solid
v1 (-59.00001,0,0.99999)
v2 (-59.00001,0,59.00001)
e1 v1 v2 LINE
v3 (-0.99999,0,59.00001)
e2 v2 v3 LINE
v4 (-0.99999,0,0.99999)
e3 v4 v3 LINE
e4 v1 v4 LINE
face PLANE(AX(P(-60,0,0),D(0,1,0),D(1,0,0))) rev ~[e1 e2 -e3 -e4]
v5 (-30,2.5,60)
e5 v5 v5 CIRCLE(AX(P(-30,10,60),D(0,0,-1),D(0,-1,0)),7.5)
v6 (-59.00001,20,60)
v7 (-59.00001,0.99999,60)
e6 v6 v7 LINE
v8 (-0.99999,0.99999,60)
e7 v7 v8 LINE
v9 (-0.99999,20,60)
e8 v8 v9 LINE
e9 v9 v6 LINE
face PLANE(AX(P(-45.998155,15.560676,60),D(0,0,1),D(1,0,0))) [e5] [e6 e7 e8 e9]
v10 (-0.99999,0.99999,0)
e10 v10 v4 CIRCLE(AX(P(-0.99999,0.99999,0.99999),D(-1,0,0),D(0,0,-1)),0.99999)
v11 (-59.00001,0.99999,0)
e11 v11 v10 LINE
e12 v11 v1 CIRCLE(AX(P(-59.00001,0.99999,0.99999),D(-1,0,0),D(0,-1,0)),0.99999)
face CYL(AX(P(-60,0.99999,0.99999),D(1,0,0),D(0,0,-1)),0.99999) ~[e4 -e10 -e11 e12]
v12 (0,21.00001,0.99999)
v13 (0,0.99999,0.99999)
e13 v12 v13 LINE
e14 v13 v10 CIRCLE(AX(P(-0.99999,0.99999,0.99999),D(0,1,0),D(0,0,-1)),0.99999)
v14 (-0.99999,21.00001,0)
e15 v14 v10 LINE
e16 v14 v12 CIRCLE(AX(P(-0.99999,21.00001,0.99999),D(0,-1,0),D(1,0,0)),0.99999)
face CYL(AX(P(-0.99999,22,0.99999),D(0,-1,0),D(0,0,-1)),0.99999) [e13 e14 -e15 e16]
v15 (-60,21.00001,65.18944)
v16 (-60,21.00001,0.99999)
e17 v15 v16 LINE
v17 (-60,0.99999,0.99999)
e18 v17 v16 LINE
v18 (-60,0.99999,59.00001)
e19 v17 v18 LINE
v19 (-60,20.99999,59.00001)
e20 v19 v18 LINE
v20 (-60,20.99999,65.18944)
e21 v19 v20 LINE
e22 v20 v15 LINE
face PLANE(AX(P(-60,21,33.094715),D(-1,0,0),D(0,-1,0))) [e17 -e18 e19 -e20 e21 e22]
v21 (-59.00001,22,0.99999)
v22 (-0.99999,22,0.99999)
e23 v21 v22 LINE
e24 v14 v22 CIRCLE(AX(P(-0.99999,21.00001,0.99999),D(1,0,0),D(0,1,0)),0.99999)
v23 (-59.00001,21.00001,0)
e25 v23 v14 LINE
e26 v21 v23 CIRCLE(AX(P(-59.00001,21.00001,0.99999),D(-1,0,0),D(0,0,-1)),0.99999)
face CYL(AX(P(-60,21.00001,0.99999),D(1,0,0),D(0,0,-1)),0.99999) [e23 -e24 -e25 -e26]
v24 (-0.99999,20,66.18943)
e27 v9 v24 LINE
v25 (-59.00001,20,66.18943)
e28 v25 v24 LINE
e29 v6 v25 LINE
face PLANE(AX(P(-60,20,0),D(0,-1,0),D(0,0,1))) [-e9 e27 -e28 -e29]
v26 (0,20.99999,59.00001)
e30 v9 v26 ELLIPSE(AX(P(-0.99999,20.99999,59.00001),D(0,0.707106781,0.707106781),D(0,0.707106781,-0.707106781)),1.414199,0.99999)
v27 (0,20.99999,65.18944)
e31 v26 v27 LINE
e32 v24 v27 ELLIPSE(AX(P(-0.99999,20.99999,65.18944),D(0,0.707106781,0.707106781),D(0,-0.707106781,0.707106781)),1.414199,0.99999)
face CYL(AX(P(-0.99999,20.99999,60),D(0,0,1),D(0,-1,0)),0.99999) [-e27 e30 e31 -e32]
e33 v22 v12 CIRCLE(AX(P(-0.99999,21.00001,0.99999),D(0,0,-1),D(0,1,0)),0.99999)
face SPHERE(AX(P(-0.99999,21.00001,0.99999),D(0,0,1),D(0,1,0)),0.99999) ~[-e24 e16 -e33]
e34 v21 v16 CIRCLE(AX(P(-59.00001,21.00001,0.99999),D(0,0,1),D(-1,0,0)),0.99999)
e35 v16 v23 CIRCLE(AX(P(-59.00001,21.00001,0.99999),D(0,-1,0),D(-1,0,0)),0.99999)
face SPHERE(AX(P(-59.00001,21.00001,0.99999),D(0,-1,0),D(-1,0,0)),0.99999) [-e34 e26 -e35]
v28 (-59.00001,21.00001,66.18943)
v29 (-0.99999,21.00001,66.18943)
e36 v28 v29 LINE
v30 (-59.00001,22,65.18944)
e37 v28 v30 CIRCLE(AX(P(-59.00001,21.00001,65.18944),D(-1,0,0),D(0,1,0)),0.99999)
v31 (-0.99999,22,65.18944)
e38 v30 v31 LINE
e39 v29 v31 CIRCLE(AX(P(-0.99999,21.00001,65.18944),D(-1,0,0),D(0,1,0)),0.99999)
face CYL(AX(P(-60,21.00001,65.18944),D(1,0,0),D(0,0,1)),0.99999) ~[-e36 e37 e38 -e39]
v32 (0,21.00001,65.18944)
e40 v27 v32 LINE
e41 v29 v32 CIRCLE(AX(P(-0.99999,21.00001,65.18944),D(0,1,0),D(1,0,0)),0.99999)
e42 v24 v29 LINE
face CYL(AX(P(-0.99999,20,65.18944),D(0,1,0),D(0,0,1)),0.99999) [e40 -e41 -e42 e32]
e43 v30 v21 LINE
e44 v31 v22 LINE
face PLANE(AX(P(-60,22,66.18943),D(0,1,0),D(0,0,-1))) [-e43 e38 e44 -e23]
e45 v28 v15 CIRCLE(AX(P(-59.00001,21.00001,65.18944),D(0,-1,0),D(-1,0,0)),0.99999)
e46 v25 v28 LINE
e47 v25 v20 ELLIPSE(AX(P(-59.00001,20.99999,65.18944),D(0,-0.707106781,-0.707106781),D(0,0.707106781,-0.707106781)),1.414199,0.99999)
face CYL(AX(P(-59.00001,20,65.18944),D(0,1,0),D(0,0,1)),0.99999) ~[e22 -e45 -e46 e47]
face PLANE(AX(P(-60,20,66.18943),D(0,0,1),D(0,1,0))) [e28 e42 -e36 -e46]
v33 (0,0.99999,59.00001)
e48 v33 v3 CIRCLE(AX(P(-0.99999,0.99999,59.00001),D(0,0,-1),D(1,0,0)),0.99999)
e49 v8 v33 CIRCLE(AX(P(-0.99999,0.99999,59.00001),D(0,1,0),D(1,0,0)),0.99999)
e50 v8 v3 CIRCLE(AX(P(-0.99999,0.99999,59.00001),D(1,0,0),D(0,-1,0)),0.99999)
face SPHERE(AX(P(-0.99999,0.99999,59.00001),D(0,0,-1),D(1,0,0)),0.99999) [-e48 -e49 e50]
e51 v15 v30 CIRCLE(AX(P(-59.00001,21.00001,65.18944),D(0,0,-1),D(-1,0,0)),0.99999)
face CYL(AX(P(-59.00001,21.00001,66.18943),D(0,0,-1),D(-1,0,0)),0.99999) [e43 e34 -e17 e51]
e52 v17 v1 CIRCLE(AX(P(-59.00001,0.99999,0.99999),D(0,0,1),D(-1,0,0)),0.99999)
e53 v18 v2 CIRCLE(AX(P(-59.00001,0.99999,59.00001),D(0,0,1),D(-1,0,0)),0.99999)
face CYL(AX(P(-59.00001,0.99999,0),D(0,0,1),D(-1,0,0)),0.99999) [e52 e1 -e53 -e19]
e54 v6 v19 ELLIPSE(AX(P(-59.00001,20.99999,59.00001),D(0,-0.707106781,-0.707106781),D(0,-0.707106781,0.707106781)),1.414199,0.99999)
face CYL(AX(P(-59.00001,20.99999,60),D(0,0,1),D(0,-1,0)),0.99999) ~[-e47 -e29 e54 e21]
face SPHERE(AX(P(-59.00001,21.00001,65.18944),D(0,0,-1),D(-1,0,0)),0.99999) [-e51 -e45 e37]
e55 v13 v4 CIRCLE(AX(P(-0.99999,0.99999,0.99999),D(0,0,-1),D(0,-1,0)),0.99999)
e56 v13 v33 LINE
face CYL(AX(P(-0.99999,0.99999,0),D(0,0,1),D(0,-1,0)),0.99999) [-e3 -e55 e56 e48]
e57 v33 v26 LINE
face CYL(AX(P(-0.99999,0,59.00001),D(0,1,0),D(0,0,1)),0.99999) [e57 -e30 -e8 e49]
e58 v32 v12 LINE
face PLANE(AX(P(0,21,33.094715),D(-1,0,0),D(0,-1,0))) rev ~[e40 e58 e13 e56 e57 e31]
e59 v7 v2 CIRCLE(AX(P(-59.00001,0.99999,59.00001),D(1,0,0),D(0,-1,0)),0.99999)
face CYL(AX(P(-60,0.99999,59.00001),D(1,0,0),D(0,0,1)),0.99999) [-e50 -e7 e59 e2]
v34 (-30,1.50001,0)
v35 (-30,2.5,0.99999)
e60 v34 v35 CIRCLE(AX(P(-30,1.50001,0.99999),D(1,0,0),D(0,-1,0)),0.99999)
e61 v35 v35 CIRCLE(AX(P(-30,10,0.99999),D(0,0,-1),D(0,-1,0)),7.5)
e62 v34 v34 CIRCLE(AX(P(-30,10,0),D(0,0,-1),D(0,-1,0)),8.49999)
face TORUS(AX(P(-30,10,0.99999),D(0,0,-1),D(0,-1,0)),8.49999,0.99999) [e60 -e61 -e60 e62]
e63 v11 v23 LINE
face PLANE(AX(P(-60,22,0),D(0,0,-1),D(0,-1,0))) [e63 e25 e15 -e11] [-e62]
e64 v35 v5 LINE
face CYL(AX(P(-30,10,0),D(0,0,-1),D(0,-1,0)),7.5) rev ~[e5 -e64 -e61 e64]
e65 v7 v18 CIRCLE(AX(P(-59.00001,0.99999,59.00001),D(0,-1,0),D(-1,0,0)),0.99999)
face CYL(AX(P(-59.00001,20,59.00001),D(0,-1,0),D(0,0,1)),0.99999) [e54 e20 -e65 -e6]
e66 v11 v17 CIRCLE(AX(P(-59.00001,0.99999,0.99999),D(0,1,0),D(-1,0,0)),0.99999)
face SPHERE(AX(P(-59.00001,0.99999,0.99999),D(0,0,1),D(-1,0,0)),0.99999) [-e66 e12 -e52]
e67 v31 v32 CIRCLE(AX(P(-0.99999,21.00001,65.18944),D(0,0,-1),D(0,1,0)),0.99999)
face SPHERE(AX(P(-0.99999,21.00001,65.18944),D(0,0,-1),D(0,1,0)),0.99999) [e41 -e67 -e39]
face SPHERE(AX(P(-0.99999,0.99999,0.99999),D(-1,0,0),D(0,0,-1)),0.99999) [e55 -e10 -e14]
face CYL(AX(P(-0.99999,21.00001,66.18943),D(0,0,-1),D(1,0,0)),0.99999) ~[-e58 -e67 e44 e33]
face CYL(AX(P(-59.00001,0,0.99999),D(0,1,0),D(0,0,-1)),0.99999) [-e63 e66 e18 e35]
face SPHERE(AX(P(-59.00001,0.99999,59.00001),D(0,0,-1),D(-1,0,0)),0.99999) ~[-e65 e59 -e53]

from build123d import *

# Parameters (mm, degrees)
F1_DEPTH = 60
F3_DEPTH = 60
F4_R     = 0.99999


# Not quite as in the source:
# - a fillet or chamfer is up to 0.001 mm smaller than in the source, because OpenCascade refuses the exact size
# - the program builds the solid bodies; features that only make, move or delete a surface that nothing else refers to are left out


with BuildPart() as f1:
    # F0 (on Top) → F1 (new body)
    with BuildSketch(Plane.XY):
        with BuildLine():
            Line((-60, 20), (-60, 10))
            Line((-60, 10), (-37.5, 10))
            ThreePointArc((-37.5, 10), (-35.3033008589, 15.3033008589), (-30, 17.5))
            Line((-30, 17.5), (-30, 20))
            Line((-30, 20), (-60, 20))
        make_face()
        with BuildLine():
            Line((-22.5, 10), (0, 10))
            Line((0, 10), (0, 20))
            Line((0, 20), (-30, 20))
            Line((-30, 20), (-30, 17.5))
            ThreePointArc((-30, 17.5), (-24.6966991411, 15.3033008589), (-22.5, 10))
        make_face()
        with BuildLine():
            Line((-30, 0), (0, 0))
            Line((0, 0), (0, 10))
            Line((0, 10), (-22.5, 10))
            ThreePointArc((-22.5, 10), (-24.6966991411, 4.6966991411), (-30, 2.5))
            Line((-30, 2.5), (-30, 0))
        make_face()
        with BuildLine():
            Line((-60, 0), (-30, 0))
            Line((-30, 0), (-30, 2.5))
            ThreePointArc((-30, 2.5), (-35.3033008589, 4.6966991411), (-37.5, 10))
            Line((-37.5, 10), (-60, 10))
            Line((-60, 10), (-60, 0))
        make_face()
    extrude(amount=F1_DEPTH)

    # F2 (on face) → F3 (join)
    with BuildSketch(Plane(origin=(-60, 0, 0), x_dir=(0, -1, 0), z_dir=(-1, 0, 0))):
        Polygon((-22, 0), (-20, 0), (-20, 60), (-20, 66.1894296401), (-22, 66.1894296401), align=None)
    extrude(amount=-F3_DEPTH)

    # F4 (radius 1 in the source; OpenCascade refuses exactly that, so slightly less here)
    f4_edges = [f1.edges().sort_by_distance(p)[0] for p in [
        (0, 22, 33.094715),
        (-60, 0, 30),
        (-60, 11, 0),
        (-60, 22, 33.094715),
        (-60, 21, 66.18943),
        (-60, 20, 63.094715),
        (-60, 10, 60),
        (-30, 22, 66.18943),
        (-30, 22, 0),
        (-30, 0, 0),
        (0, 11, 0),
        (-30, 17.5, 0),
        (0, 0, 30),
        (0, 10, 60),
        (0, 20, 63.094715),
        (0, 21, 66.18943),
        (-30, 0, 60),
    ]]
    fillet(f4_edges, radius=F4_R)


solid = f1.part
